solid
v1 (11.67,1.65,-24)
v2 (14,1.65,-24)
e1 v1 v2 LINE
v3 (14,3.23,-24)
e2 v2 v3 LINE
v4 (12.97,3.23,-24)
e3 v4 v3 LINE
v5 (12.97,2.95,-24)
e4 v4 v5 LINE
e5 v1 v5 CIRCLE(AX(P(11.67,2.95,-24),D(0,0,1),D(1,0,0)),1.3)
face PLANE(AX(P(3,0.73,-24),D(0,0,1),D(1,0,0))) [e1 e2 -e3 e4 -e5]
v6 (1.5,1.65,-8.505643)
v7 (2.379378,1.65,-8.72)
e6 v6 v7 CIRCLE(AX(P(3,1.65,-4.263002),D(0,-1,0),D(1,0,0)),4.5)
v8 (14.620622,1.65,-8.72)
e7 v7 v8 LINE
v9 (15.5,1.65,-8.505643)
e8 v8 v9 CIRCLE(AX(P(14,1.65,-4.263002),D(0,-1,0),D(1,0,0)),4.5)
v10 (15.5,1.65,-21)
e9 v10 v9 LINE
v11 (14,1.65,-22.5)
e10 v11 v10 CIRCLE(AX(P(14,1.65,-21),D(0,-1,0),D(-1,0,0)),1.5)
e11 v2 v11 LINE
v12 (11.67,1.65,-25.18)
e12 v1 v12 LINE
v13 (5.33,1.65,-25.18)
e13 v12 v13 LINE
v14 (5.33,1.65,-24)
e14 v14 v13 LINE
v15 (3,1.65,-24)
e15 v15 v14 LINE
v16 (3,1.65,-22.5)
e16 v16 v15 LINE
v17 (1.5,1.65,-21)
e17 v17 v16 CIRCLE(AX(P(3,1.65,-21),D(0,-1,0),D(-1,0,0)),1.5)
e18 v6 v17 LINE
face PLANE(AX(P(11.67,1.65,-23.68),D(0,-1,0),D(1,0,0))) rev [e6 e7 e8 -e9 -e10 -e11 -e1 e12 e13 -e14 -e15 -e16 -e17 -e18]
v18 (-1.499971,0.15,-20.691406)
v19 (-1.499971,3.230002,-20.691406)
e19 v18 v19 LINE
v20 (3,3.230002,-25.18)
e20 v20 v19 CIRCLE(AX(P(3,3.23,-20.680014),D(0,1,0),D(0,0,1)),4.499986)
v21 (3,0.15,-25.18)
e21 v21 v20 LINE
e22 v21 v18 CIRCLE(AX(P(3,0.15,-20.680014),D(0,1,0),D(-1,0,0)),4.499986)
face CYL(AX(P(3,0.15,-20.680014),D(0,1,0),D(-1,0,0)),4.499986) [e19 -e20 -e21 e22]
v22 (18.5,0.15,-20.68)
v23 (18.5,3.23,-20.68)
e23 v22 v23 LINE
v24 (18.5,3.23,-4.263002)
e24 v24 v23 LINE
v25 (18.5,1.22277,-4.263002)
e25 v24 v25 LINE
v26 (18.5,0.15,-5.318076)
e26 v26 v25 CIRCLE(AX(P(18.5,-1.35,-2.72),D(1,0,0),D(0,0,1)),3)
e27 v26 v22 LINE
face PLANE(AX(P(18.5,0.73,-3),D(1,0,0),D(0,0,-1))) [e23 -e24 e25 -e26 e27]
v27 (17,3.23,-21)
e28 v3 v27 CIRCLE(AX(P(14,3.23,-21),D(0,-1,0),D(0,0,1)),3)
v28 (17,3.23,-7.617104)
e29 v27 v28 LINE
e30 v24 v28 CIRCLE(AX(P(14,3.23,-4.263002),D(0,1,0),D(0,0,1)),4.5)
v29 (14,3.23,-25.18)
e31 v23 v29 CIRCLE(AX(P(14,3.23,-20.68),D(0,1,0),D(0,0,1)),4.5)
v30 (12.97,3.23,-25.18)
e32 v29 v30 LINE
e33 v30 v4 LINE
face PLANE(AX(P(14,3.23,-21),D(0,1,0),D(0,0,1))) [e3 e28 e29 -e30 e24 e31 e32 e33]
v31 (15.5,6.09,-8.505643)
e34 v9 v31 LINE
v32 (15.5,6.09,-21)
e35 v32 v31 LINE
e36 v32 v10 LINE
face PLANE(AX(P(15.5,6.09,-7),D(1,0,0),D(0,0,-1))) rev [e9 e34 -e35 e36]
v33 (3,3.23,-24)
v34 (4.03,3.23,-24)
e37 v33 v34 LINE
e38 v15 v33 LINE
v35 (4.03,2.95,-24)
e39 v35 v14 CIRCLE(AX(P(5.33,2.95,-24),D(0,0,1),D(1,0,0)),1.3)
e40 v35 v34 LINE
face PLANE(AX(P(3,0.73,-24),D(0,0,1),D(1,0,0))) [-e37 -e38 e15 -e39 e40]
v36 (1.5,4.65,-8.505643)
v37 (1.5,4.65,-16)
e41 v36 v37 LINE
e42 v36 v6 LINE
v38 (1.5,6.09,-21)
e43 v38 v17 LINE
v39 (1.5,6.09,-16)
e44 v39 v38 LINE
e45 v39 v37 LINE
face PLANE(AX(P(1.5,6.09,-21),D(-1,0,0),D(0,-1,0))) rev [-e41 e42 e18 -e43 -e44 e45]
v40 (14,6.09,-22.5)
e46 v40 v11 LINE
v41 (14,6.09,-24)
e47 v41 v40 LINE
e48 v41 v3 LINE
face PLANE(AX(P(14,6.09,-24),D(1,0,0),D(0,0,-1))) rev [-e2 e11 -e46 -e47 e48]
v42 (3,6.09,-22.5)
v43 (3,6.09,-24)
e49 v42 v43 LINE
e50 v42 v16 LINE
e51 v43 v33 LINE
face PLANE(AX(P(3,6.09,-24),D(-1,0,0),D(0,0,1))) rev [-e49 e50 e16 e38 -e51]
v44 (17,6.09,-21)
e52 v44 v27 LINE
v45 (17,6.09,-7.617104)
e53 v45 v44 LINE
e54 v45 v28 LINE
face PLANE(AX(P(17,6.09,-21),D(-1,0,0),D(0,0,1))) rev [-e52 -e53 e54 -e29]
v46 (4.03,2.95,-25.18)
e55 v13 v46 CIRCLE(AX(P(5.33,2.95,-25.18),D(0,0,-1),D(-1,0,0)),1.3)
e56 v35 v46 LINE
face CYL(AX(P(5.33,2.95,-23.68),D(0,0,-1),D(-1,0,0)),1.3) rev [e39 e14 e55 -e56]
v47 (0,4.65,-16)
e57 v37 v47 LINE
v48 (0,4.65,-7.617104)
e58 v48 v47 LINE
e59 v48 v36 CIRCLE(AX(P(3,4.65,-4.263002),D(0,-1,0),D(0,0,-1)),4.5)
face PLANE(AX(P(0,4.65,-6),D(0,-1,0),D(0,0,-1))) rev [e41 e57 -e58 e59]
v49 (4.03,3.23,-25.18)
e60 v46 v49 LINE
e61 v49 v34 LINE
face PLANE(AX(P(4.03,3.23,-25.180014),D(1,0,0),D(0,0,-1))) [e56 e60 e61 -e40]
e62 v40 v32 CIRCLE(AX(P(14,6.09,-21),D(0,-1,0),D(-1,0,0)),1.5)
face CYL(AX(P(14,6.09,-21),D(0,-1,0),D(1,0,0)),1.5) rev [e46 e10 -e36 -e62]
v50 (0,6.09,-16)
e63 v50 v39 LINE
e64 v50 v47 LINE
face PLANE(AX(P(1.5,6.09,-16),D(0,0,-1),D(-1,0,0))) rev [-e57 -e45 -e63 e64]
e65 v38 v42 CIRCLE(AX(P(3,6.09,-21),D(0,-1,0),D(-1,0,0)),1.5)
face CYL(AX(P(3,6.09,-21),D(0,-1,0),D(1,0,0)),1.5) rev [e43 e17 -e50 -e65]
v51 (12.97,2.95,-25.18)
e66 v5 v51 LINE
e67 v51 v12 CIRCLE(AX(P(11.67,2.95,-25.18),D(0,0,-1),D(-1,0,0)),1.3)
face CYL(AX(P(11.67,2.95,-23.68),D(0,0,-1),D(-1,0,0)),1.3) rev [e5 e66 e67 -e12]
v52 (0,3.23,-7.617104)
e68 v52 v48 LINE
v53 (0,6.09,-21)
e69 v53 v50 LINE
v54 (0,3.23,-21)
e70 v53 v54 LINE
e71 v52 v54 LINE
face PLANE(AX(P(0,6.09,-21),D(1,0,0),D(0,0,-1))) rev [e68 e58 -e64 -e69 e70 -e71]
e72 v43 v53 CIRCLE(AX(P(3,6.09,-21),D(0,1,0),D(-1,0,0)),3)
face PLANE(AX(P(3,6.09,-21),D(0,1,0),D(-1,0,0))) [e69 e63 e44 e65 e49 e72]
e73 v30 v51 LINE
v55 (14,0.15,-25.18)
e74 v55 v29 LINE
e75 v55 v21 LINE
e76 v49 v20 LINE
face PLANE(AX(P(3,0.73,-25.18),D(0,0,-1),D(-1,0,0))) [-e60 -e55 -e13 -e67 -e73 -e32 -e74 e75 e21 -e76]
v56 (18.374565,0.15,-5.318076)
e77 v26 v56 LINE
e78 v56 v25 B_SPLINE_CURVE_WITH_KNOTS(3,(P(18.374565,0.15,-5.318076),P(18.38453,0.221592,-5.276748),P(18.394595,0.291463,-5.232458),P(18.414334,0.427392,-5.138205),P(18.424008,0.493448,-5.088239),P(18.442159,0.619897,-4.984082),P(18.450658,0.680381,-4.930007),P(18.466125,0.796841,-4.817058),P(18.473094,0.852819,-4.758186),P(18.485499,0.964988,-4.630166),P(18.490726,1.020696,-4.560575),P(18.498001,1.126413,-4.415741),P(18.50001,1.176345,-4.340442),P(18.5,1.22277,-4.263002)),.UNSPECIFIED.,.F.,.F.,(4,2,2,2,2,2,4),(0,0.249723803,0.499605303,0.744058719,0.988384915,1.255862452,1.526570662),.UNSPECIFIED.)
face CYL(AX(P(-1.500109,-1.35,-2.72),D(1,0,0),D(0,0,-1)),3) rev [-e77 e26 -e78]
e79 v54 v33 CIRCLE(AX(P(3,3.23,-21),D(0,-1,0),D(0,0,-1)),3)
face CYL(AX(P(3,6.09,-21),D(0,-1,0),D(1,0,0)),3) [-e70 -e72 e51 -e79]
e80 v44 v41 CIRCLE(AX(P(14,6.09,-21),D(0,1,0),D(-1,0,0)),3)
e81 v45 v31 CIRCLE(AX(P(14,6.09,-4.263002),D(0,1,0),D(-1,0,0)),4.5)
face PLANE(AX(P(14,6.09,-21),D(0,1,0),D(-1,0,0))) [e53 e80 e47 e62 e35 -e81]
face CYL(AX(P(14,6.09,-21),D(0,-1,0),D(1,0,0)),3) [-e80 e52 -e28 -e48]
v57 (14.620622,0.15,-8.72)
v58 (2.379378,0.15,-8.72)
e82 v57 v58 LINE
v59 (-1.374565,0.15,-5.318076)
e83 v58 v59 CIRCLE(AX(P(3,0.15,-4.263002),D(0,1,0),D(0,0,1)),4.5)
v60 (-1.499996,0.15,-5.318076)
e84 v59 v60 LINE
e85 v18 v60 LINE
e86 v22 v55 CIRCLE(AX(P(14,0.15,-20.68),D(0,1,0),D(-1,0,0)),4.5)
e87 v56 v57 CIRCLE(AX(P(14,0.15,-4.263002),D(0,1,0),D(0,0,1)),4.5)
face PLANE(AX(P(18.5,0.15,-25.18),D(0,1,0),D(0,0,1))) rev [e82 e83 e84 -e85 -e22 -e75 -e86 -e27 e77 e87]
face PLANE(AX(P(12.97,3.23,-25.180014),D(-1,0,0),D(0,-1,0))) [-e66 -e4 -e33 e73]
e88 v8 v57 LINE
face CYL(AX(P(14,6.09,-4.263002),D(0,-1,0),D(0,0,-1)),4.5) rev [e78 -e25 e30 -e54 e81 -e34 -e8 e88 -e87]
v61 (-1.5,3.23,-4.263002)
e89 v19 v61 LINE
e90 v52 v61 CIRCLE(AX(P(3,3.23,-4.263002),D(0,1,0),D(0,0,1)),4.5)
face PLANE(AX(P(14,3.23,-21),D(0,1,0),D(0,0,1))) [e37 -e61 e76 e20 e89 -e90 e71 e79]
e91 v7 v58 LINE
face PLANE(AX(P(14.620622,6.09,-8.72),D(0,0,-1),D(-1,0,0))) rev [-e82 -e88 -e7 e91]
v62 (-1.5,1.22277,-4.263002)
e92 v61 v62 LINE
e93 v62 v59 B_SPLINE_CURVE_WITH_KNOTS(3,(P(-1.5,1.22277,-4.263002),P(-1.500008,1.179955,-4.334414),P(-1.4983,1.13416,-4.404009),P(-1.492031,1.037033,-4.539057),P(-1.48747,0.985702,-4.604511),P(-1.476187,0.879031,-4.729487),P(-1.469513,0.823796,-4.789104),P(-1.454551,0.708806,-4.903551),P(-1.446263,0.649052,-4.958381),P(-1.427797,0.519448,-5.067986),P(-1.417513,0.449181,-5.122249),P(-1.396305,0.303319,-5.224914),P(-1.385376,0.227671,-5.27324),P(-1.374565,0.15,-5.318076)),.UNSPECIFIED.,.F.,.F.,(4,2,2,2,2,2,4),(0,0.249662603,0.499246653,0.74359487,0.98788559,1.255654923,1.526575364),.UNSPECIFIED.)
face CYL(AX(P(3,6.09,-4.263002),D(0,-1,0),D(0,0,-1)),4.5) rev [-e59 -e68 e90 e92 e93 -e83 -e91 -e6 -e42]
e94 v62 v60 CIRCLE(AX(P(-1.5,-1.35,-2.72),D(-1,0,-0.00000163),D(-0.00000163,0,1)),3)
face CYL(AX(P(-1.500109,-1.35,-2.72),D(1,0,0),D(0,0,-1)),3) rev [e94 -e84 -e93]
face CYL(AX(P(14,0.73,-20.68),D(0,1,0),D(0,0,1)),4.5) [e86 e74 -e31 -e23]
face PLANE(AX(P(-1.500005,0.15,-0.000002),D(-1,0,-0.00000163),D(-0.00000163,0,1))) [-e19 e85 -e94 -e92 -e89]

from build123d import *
from OCP.BRepAlgoAPI import BRepAlgoAPI_Cut
from OCP.TopTools import TopTools_ListOfShape

# Parameters (mm, degrees)
BOSS_EXTRUDE6_DEPTH      = 2.5
CUT_EXTRUDE1_DEPTH       = 30.06261
CUT_EXTRUDE1_DEPTH_BACK  = 1.5
BOSS_EXTRUDE7_DEPTH      = 18.5
BOSS_EXTRUDE7_DEPTH_BACK = 1.5
CUT_EXTRUDE2_DEPTH       = 32.362831921
CUT_EXTRUDE2_DEPTH_BACK  = 32.362831921
SKETCH14_R               = 0.75
BOSS_EXTRUDE9_START      = 4.44
SKETCH19_W               = 1.5
SKETCH19_H               = 4
BOSS_EXTRUDE9_DEPTH      = 4.44
SKETCH21_W               = 1.5
SKETCH21_H               = 3
BOSS_EXTRUDE11_DEPTH     = 10
CUT_EXTRUDE3_DEPTH       = 34.819018318
CUT_EXTRUDE3_DEPTH_BACK  = 34.819018318
CUT_EXTRUDE4_DEPTH       = 32.833480802
CUT_EXTRUDE4_DEPTH_BACK  = 32.833480802


with BuildPart() as part:
    # Sketch9 → Boss-Extrude6 (new body)
    with BuildSketch(Plane(origin=(0, 3.23, 0), x_dir=(1, 0, 0), z_dir=(0, 1, 0))):
        with BuildLine():
            Line((3, 25.18), (14, 25.18))
            ThreePointArc((14, 25.18), (17.181980515, 23.861980515), (18.5, 20.68))
            Line((18.5, 20.68), (18.5, 3))
            Line((18.5, 3), (17, 3))
            Line((17, 3), (17, 21))
            ThreePointArc((17, 21), (16.121320344, 23.121320344), (14, 24))
            Line((14, 24), (3, 24))
            ThreePointArc((3, 24), (0.878679656, 23.121320344), (0, 21))
            Line((0, 21), (0, 3))
            Line((0, 3), (-1.5, 3))
            Line((-1.5, 3), (-1.5, 21))
            ThreePointArc((-1.5, 21), (-0.073983127, 23.977063175), (3, 25.18))
        make_face()
    extrude(amount=-BOSS_EXTRUDE6_DEPTH)

    # Sketch7 → Cut-Extrude1 (cut, two sides: drawn at the far end of the back side and taken through both)
    with BuildSketch(Plane(origin=(0, 0, -25.18), x_dir=(-1, 0, 0), z_dir=(0, 0, -1)).offset(-CUT_EXTRUDE1_DEPTH_BACK)):
        with BuildLine():
            Line((-12.97, 3.23), (-4.03, 3.23))
            Line((-4.03, 3.23), (-4.03, 2.95))
            ThreePointArc((-4.03, 2.95), (-4.410761184, 2.030761184), (-5.33, 1.65))
            Line((-5.33, 1.65), (-11.67, 1.65))
            ThreePointArc((-11.67, 1.65), (-12.589238816, 2.030761184), (-12.97, 2.95))
            Line((-12.97, 2.95), (-12.97, 3.23))
        make_face()
    extrude(amount=CUT_EXTRUDE1_DEPTH + CUT_EXTRUDE1_DEPTH_BACK, mode=Mode.SUBTRACT)

    # Sketch12 → Boss-Extrude7 (add, two sides: drawn at the far end of the back side and taken through both)
    with BuildSketch(Plane(origin=(0, 0, 0), x_dir=(0, 0, -1), z_dir=(1, 0, 0)).offset(-BOSS_EXTRUDE7_DEPTH_BACK)):
        Polygon((6.787278953, 1.65), (1.644409133, 1.65), (1.644409133, 0.15), (8.72, 0.15), (25.18, 0.15), (25.18, 1.65), align=None)
    extrude(amount=BOSS_EXTRUDE7_DEPTH + BOSS_EXTRUDE7_DEPTH_BACK)

    # Sketch14 → Cut-Extrude2 (cut, two sides: drawn at the far end of the back side and taken through both)
    # profile 1 of 5: a face of its own
    with BuildSketch(Plane(origin=(0, 2.86, 0), x_dir=(1, 0, 0), z_dir=(0, 1, 0)).offset(-CUT_EXTRUDE2_DEPTH_BACK)):
        Polygon((14.01139117, 26.68), (3.013153393, 26.68), (2.986846607, 26.68), (-3, 26.68), (-3, 21.049560468), (-3, 3), (-3, -2.88), (-3, -8.88), (3, -8.88), (13.998237777, -8.88), (14.024544563, -8.88), (20, -8.88), (20, -3.249560468), (20, 2.630439532), (20, 20.68), (20, 26.68), align=None)
        with BuildLine():
            Line((14, -7.38), (3, -7.38))
            ThreePointArc((3, -7.38), (-0.181980515, -6.061980515), (-1.5, -2.88))
            Line((-1.5, -2.88), (-1.5, 3))
            Line((-1.5, 3), (-1.499971165, 20.691405551))
            ThreePointArc((-1.499971165, 20.691405551), (-0.177940395, 23.866009567), (3, 25.18))
            Line((3, 25.18), (14, 25.18))
            ThreePointArc((14, 25.18), (17.181980515, 23.861980515), (18.5, 20.68))
            Line((18.5, 20.68), (18.5, 3))
            Line((18.5, 3), (18.5, -2.88))
            ThreePointArc((18.5, -2.88), (17.181980515, -6.061980515), (14, -7.38))
        make_face(mode=Mode.SUBTRACT)
    # profile 2 of 5: a face of its own
    with BuildSketch(Plane(origin=(0, 2.86, 0), x_dir=(1, 0, 0), z_dir=(0, 1, 0)).offset(-CUT_EXTRUDE2_DEPTH_BACK)):
        with Locations((4.75, 1.52)):
            Circle(SKETCH14_R)
    # profile 3 of 5: a face of its own
    with BuildSketch(Plane(origin=(0, 2.86, 0), x_dir=(1, 0, 0), z_dir=(0, 1, 0)).offset(-CUT_EXTRUDE2_DEPTH_BACK)):
        with Locations((7.25, 1.52)):
            Circle(SKETCH14_R)
    # profile 4 of 5: a face of its own
    with BuildSketch(Plane(origin=(0, 2.86, 0), x_dir=(1, 0, 0), z_dir=(0, 1, 0)).offset(-CUT_EXTRUDE2_DEPTH_BACK)):
        with Locations((9.75, 1.52)):
            Circle(SKETCH14_R)
    # profile 5 of 5: a face of its own
    with BuildSketch(Plane(origin=(0, 2.86, 0), x_dir=(1, 0, 0), z_dir=(0, 1, 0)).offset(-CUT_EXTRUDE2_DEPTH_BACK)):
        with Locations((12.25, 1.52)):
            Circle(SKETCH14_R)
    extrude(amount=CUT_EXTRUDE2_DEPTH + CUT_EXTRUDE2_DEPTH_BACK, mode=Mode.SUBTRACT)

    # Sketch19 → Boss-Extrude9 (add)
    with BuildSketch(Plane(origin=(0, 1.65, 0), x_dir=(1, 0, 0), z_dir=(0, 1, 0)).offset(BOSS_EXTRUDE9_START)):
        with BuildLine():
            Line((17, 21), (17, 16))
            Line((17, 16), (17, 7))
            Line((17, 7), (17, 3))
            Line((17, 3), (15.5, 3))
            Line((15.5, 3), (15.5, 7))
            Line((15.5, 7), (15.5, 16))
            Line((15.5, 16), (15.5, 21))
            ThreePointArc((15.5, 21), (15.060660172, 22.060660172), (14, 22.5))
            Line((14, 22.5), (14, 24))
            ThreePointArc((14, 24), (16.121320344, 23.121320344), (17, 21))
        make_face()
        with BuildLine():
            Line((0, 21), (0, 16))
            Line((0, 16), (1.5, 16))
            Line((1.5, 16), (1.5, 21))
            ThreePointArc((1.5, 21), (1.939339828, 22.060660172), (3, 22.5))
            Line((3, 22.5), (3, 24))
            ThreePointArc((3, 24), (0.878679656, 23.121320344), (0, 21))
        make_face()
        with Locations((0.75, 5)):
            Rectangle(SKETCH19_W, SKETCH19_H)
    extrude(amount=-BOSS_EXTRUDE9_DEPTH)

    # Sketch21 → Boss-Extrude11 (add)
    with BuildSketch(Plane.XY.offset(-16)):
        with Locations((0.75, 3.15)):
            Rectangle(SKETCH21_W, SKETCH21_H)
    extrude(amount=BOSS_EXTRUDE11_DEPTH)


with BuildPart() as cut_extrude3_tool:
    # Sketch17 → Cut-Extrude3 (new, two sides: drawn at the far end of the back side and taken through both)
    with BuildSketch(Plane(origin=(0, -6.85, 0), x_dir=(-1, 0, 0), z_dir=(0, -1, 0)).offset(-CUT_EXTRUDE3_DEPTH_BACK)):
        with BuildLine():
            Line((-14.620622145, 8.72), (-2.379377855, 8.72))
            ThreePointArc((-2.379377855, 8.72), (0.394318757, 7.217422785), (1.5, 4.263002339))
            Line((1.5, 4.263002339), (1.5, -1.5))
            Line((1.5, -1.5), (-18.5, -1.5))
            Line((-18.5, -1.5), (-18.5, 4.263002339))
            ThreePointArc((-18.5, 4.263002339), (-17.394318757, 7.217422785), (-14.620622145, 8.72))
        make_face()
    extrude(amount=CUT_EXTRUDE3_DEPTH + CUT_EXTRUDE3_DEPTH_BACK)


with BuildPart() as part_1:
    add(part.part)

    # Cut-Extrude3: cut by cut_extrude3_tool, with a tolerance
    cut_extrude3_stock = TopTools_ListOfShape()
    cut_extrude3_stock.Append(part_1.part.wrapped)
    cut_extrude3_tools = TopTools_ListOfShape()
    cut_extrude3_tools.Append(cut_extrude3_tool.part.wrapped)
    cut_extrude3_cut = BRepAlgoAPI_Cut()
    cut_extrude3_cut.SetArguments(cut_extrude3_stock)
    cut_extrude3_cut.SetTools(cut_extrude3_tools)
    cut_extrude3_cut.SetFuzzyValue(0.00001)
    cut_extrude3_cut.Build()
    add(Compound.cast(cut_extrude3_cut.Shape()).solids(), mode=Mode.REPLACE)

    # Sketch20 → Cut-Extrude4 (cut, two sides: drawn at the far end of the back side and taken through both)
    with BuildSketch(Plane(origin=(0, 0, 0), x_dir=(0, 0, -1), z_dir=(1, 0, 0)).offset(-CUT_EXTRUDE4_DEPTH_BACK)):
        with BuildLine():
            Line((-1.38, 1.65), (0.12, 1.65))
            Line((0.12, 1.65), (2.72, 1.65))
            ThreePointArc((2.72, 1.65), (4.841320344, 0.771320344), (5.72, -1.35))
            Line((5.72, -1.35), (5.72, -6.35))
            Line((5.72, -6.35), (5.72, -7.888681431))
            Line((5.72, -7.888681431), (-4.38, -7.888681431))
            Line((-4.38, -7.888681431), (-4.38, -6.35))
            Line((-4.38, -6.35), (-4.38, -1.35))
            ThreePointArc((-4.38, -1.35), (-3.501320344, 0.771320344), (-1.38, 1.65))
        make_face()
    extrude(amount=CUT_EXTRUDE4_DEPTH + CUT_EXTRUDE4_DEPTH_BACK, mode=Mode.SUBTRACT)


solid = part_1.part
